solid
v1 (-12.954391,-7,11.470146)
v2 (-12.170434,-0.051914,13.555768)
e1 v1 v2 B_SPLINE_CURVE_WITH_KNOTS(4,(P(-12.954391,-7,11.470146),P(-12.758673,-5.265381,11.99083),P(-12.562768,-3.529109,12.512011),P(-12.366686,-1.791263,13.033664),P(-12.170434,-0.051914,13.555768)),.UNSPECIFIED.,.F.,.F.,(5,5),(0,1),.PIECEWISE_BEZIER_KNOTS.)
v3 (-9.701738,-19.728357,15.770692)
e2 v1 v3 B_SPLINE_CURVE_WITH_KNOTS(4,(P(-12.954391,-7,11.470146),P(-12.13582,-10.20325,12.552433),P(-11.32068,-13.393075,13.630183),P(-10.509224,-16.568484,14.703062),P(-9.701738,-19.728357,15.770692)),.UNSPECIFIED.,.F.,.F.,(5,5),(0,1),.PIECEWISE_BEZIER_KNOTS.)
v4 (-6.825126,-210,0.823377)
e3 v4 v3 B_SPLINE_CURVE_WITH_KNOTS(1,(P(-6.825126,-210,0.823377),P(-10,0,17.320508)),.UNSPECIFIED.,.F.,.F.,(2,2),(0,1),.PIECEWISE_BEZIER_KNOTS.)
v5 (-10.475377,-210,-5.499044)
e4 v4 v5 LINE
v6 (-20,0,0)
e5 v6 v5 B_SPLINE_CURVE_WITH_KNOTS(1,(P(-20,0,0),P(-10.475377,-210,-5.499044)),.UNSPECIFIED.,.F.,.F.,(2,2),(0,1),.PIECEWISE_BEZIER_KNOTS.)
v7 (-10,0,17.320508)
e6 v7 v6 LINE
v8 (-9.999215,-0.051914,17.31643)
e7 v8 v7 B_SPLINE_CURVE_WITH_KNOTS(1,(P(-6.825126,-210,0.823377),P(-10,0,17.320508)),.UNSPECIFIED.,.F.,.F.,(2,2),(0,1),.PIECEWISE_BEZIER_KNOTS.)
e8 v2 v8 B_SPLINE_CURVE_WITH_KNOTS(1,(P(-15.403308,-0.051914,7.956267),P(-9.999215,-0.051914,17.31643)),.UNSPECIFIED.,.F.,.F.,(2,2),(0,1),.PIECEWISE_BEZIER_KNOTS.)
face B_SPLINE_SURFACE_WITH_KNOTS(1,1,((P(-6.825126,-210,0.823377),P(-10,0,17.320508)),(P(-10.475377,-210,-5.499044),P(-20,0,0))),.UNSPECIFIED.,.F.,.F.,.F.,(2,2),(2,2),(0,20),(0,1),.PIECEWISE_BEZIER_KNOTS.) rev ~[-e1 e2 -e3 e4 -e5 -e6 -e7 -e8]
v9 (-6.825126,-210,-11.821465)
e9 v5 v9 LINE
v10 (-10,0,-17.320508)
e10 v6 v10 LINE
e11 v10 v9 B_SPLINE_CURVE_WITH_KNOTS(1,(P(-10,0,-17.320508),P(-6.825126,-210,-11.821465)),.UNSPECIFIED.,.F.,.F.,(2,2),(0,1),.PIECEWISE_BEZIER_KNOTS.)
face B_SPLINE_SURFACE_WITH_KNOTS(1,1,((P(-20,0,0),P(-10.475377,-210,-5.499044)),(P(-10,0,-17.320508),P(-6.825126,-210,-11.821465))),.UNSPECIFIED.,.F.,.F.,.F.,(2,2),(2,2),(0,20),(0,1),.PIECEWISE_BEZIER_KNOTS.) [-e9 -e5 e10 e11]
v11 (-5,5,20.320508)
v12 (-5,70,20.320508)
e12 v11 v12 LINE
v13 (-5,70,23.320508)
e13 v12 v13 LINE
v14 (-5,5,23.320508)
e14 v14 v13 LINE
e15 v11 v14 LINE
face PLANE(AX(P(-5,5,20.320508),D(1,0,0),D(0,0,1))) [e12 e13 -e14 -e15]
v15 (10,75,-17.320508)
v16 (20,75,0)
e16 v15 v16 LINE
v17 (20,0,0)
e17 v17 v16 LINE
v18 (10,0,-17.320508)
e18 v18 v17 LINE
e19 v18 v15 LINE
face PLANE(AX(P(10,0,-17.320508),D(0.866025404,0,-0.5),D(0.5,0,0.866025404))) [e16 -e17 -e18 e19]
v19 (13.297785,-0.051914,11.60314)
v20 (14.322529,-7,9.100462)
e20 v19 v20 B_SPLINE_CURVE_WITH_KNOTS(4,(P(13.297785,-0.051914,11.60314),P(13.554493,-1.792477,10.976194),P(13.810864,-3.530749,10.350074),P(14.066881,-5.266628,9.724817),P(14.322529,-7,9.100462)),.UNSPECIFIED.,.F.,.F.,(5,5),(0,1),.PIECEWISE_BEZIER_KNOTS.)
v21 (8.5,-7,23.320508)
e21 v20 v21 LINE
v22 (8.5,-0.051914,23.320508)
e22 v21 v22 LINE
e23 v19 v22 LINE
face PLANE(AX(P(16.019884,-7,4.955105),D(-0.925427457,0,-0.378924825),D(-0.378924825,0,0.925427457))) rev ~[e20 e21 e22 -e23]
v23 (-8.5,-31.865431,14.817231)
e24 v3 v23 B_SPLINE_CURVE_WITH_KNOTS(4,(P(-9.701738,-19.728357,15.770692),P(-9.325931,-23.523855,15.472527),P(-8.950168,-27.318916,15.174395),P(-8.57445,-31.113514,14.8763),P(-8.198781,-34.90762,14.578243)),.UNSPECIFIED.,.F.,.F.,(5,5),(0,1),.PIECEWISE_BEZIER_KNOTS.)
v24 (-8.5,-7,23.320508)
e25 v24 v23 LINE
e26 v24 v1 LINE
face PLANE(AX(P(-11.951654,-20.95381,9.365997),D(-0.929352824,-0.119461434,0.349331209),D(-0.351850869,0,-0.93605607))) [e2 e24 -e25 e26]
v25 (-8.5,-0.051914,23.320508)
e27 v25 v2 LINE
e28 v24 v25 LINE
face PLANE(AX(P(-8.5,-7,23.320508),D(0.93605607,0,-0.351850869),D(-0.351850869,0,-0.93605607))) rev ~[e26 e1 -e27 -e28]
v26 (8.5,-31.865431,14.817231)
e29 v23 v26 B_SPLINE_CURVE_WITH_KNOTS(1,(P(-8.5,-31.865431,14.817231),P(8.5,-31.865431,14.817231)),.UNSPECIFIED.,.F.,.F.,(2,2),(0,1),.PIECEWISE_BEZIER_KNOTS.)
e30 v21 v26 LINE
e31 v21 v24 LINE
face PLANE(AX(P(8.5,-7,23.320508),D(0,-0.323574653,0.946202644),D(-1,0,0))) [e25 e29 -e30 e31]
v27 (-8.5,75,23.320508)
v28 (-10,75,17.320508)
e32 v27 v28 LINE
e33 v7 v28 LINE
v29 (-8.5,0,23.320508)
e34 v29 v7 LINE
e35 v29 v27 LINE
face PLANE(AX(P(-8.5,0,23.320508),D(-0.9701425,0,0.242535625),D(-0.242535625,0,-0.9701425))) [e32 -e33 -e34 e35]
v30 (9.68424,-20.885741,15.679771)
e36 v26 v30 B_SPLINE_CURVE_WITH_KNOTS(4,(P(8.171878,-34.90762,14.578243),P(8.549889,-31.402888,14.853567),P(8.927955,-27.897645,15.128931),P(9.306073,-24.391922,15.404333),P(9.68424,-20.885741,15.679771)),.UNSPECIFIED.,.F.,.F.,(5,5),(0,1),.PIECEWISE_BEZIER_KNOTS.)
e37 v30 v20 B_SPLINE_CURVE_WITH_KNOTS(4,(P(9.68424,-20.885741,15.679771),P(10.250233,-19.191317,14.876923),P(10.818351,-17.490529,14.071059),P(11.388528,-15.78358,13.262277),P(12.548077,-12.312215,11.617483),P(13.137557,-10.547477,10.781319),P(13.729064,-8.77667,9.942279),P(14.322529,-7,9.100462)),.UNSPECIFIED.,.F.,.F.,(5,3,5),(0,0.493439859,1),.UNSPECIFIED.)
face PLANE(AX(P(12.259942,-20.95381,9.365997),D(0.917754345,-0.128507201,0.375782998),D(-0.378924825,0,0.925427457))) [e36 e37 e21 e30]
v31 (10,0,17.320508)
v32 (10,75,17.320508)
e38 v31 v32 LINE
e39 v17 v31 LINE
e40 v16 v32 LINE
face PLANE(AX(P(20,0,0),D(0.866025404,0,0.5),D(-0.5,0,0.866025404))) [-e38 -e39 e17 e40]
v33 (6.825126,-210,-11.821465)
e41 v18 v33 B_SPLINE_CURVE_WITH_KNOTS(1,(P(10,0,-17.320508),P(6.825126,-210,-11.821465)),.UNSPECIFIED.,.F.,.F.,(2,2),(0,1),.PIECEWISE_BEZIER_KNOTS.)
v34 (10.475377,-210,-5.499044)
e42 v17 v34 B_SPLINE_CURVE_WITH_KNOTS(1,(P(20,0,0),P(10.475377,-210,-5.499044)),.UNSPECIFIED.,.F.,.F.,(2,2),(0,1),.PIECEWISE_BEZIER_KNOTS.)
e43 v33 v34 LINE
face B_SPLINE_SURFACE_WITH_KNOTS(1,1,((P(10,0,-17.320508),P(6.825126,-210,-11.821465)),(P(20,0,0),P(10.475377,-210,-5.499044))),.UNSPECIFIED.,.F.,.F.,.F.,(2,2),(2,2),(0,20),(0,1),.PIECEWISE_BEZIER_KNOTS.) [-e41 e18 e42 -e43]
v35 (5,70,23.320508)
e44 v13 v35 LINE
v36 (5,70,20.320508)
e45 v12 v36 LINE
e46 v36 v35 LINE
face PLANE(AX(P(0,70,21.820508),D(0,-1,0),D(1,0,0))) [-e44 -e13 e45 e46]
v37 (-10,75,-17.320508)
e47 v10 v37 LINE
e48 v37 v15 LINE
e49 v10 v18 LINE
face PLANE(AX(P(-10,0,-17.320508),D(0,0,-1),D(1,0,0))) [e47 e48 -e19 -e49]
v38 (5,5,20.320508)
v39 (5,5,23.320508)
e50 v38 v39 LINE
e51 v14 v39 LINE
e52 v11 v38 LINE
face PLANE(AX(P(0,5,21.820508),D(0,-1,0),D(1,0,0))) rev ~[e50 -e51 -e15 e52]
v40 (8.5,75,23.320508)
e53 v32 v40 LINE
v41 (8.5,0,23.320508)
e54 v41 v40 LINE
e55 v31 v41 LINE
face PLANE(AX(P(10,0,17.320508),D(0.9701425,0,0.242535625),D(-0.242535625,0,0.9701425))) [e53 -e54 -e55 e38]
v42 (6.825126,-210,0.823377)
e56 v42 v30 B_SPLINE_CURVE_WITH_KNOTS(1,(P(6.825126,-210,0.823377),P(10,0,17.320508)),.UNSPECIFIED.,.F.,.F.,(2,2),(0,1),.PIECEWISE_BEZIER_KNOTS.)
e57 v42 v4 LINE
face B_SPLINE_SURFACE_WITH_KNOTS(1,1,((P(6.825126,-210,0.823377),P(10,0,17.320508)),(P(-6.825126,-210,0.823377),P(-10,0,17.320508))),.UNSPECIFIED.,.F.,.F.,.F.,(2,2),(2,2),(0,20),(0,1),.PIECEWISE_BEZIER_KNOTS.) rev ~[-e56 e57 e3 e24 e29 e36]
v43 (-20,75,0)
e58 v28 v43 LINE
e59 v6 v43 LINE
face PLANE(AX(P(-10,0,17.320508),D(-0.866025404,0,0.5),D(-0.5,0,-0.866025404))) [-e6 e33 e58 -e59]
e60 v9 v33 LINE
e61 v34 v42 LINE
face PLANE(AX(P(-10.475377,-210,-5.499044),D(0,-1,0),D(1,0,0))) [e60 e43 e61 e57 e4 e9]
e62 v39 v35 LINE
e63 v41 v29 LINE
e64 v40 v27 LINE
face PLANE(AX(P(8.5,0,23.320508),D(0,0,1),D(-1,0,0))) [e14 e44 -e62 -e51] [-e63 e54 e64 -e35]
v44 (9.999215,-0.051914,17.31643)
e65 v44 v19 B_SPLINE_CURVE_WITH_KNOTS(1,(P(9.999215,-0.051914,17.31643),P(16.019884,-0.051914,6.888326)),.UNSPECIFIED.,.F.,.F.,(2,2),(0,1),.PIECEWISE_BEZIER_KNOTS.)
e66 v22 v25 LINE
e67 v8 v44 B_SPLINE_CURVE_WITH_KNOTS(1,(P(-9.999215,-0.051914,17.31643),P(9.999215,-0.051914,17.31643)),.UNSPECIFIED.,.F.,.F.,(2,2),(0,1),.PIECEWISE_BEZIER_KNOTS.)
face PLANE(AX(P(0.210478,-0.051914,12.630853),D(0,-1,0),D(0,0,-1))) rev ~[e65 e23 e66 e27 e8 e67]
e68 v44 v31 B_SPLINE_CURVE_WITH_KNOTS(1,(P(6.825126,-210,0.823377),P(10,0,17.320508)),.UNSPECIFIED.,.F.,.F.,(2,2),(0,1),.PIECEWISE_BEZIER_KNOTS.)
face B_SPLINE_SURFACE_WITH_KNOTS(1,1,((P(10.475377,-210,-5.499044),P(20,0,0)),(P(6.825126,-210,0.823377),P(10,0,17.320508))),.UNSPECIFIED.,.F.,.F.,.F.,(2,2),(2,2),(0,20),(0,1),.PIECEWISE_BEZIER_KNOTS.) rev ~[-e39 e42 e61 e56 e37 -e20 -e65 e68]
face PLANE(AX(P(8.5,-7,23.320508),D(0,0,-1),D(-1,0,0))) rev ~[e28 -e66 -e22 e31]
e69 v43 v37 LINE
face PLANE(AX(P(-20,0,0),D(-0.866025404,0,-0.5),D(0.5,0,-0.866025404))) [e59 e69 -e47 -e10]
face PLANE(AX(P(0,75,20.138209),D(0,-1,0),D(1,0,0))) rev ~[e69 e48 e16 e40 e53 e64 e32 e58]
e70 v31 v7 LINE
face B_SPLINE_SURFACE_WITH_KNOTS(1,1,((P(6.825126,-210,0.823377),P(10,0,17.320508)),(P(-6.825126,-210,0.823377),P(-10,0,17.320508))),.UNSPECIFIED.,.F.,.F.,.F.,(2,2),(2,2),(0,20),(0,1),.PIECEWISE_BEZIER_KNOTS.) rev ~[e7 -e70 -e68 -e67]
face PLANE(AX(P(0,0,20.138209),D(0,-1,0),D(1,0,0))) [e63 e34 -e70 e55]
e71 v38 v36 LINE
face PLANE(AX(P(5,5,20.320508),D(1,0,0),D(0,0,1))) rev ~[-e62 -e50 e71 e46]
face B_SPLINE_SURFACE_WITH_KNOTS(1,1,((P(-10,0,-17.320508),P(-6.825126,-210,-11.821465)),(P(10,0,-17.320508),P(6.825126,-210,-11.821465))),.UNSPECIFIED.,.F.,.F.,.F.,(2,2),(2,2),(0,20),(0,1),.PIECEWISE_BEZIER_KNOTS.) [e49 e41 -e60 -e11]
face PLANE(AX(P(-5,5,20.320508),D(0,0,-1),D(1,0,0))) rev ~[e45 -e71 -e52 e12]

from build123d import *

# Parameters (mm, degrees)
F1_DEPTH  = 75
F3_DEPTH  = 210
F3_TAPER  = 1.5
F7_DEPTH  = 75
F10_W     = 10
F10_H     = 3
F11_DEPTH = 65


# Not quite as in the source:
# - a feature names something its author has since deleted; it is built from what else it names


with BuildPart() as f1:
    # F0 (on Front) → F1 (new body)
    with BuildSketch(Plane.XZ):
        Polygon((-10, -17.3205080757), (10, -17.3205080757), (20, 0), (10, 17.3205080757), (-10, 17.3205080757), (-20, 0), align=None)
    extrude(amount=-F1_DEPTH)

    # F2 (on face) → F3 (join)
    with BuildSketch(Plane.XZ):
        Polygon((10, -17.3205080757), (20, 0), (-20, 0), (-10, -17.3205080757), align=None)
    extrude(amount=F3_DEPTH, taper=F3_TAPER)

    # F4 (on face) → F6 section 0
    with BuildSketch(Plane.XZ.offset(210)):
        Polygon((-10.4753772138, -5.4990435295), (10.4753772138, -5.4990435295), (6.8251257379, 0.8233774871), (-6.8251257379, 0.8233774871), align=None)
    # F5 (on face) → F6 section 1
    with BuildSketch(Plane.XZ):
        Polygon((-10, 17.3205080757), (-20, 0), (20, 0), (10, 17.3205080757), align=None)
    loft()

    # F0 (on Front) → F7 (join, through all)
    with BuildSketch(Plane.XZ):
        Polygon((-10, 17.3205080757), (10, 17.3205080757), (8.5, 23.3205080757), (-8.5, 23.3205080757), align=None)
    extrude(amount=-F7_DEPTH)

    # F10 (on offset) → F11 (cut)
    with BuildSketch(Plane.XZ.offset(-5)):
        with Locations((0, 21.8205080757)):
            Rectangle(F10_W, F10_H)
    extrude(amount=-F11_DEPTH, mode=Mode.SUBTRACT)

    # F14: sweep along a path in F13
    with BuildLine(Plane.YZ) as f14_path:
        Line((-7.1518244222, 23.3403816819), (-35.0594446063, 13.796761632))
    # F12 (on offset) → F14 (sweep)
    with BuildSketch(Plane.XZ.offset(7)):
        Polygon((-8.5, 23.3205080757), (-15.4033075124, 4.9551053697), (16.0198838661, 4.9551053697), (8.5, 23.3205080757), align=None)
    sweep(path=f14_path.line)

    # F16: sweep along a path in F15
    with BuildLine(Plane.YZ) as f16_path:
        Line((-6.9480864331, 23.3692936599), (0, 23.3692936599))
    # F12 (on offset) → F16 (sweep)
    with BuildSketch(Plane.XZ.offset(7)):
        Polygon((-8.5, 23.3205080757), (-15.4033075124, 4.9551053697), (16.0198838661, 4.9551053697), (8.5, 23.3205080757), align=None)
    sweep(path=f16_path.line)


solid = f1.part
